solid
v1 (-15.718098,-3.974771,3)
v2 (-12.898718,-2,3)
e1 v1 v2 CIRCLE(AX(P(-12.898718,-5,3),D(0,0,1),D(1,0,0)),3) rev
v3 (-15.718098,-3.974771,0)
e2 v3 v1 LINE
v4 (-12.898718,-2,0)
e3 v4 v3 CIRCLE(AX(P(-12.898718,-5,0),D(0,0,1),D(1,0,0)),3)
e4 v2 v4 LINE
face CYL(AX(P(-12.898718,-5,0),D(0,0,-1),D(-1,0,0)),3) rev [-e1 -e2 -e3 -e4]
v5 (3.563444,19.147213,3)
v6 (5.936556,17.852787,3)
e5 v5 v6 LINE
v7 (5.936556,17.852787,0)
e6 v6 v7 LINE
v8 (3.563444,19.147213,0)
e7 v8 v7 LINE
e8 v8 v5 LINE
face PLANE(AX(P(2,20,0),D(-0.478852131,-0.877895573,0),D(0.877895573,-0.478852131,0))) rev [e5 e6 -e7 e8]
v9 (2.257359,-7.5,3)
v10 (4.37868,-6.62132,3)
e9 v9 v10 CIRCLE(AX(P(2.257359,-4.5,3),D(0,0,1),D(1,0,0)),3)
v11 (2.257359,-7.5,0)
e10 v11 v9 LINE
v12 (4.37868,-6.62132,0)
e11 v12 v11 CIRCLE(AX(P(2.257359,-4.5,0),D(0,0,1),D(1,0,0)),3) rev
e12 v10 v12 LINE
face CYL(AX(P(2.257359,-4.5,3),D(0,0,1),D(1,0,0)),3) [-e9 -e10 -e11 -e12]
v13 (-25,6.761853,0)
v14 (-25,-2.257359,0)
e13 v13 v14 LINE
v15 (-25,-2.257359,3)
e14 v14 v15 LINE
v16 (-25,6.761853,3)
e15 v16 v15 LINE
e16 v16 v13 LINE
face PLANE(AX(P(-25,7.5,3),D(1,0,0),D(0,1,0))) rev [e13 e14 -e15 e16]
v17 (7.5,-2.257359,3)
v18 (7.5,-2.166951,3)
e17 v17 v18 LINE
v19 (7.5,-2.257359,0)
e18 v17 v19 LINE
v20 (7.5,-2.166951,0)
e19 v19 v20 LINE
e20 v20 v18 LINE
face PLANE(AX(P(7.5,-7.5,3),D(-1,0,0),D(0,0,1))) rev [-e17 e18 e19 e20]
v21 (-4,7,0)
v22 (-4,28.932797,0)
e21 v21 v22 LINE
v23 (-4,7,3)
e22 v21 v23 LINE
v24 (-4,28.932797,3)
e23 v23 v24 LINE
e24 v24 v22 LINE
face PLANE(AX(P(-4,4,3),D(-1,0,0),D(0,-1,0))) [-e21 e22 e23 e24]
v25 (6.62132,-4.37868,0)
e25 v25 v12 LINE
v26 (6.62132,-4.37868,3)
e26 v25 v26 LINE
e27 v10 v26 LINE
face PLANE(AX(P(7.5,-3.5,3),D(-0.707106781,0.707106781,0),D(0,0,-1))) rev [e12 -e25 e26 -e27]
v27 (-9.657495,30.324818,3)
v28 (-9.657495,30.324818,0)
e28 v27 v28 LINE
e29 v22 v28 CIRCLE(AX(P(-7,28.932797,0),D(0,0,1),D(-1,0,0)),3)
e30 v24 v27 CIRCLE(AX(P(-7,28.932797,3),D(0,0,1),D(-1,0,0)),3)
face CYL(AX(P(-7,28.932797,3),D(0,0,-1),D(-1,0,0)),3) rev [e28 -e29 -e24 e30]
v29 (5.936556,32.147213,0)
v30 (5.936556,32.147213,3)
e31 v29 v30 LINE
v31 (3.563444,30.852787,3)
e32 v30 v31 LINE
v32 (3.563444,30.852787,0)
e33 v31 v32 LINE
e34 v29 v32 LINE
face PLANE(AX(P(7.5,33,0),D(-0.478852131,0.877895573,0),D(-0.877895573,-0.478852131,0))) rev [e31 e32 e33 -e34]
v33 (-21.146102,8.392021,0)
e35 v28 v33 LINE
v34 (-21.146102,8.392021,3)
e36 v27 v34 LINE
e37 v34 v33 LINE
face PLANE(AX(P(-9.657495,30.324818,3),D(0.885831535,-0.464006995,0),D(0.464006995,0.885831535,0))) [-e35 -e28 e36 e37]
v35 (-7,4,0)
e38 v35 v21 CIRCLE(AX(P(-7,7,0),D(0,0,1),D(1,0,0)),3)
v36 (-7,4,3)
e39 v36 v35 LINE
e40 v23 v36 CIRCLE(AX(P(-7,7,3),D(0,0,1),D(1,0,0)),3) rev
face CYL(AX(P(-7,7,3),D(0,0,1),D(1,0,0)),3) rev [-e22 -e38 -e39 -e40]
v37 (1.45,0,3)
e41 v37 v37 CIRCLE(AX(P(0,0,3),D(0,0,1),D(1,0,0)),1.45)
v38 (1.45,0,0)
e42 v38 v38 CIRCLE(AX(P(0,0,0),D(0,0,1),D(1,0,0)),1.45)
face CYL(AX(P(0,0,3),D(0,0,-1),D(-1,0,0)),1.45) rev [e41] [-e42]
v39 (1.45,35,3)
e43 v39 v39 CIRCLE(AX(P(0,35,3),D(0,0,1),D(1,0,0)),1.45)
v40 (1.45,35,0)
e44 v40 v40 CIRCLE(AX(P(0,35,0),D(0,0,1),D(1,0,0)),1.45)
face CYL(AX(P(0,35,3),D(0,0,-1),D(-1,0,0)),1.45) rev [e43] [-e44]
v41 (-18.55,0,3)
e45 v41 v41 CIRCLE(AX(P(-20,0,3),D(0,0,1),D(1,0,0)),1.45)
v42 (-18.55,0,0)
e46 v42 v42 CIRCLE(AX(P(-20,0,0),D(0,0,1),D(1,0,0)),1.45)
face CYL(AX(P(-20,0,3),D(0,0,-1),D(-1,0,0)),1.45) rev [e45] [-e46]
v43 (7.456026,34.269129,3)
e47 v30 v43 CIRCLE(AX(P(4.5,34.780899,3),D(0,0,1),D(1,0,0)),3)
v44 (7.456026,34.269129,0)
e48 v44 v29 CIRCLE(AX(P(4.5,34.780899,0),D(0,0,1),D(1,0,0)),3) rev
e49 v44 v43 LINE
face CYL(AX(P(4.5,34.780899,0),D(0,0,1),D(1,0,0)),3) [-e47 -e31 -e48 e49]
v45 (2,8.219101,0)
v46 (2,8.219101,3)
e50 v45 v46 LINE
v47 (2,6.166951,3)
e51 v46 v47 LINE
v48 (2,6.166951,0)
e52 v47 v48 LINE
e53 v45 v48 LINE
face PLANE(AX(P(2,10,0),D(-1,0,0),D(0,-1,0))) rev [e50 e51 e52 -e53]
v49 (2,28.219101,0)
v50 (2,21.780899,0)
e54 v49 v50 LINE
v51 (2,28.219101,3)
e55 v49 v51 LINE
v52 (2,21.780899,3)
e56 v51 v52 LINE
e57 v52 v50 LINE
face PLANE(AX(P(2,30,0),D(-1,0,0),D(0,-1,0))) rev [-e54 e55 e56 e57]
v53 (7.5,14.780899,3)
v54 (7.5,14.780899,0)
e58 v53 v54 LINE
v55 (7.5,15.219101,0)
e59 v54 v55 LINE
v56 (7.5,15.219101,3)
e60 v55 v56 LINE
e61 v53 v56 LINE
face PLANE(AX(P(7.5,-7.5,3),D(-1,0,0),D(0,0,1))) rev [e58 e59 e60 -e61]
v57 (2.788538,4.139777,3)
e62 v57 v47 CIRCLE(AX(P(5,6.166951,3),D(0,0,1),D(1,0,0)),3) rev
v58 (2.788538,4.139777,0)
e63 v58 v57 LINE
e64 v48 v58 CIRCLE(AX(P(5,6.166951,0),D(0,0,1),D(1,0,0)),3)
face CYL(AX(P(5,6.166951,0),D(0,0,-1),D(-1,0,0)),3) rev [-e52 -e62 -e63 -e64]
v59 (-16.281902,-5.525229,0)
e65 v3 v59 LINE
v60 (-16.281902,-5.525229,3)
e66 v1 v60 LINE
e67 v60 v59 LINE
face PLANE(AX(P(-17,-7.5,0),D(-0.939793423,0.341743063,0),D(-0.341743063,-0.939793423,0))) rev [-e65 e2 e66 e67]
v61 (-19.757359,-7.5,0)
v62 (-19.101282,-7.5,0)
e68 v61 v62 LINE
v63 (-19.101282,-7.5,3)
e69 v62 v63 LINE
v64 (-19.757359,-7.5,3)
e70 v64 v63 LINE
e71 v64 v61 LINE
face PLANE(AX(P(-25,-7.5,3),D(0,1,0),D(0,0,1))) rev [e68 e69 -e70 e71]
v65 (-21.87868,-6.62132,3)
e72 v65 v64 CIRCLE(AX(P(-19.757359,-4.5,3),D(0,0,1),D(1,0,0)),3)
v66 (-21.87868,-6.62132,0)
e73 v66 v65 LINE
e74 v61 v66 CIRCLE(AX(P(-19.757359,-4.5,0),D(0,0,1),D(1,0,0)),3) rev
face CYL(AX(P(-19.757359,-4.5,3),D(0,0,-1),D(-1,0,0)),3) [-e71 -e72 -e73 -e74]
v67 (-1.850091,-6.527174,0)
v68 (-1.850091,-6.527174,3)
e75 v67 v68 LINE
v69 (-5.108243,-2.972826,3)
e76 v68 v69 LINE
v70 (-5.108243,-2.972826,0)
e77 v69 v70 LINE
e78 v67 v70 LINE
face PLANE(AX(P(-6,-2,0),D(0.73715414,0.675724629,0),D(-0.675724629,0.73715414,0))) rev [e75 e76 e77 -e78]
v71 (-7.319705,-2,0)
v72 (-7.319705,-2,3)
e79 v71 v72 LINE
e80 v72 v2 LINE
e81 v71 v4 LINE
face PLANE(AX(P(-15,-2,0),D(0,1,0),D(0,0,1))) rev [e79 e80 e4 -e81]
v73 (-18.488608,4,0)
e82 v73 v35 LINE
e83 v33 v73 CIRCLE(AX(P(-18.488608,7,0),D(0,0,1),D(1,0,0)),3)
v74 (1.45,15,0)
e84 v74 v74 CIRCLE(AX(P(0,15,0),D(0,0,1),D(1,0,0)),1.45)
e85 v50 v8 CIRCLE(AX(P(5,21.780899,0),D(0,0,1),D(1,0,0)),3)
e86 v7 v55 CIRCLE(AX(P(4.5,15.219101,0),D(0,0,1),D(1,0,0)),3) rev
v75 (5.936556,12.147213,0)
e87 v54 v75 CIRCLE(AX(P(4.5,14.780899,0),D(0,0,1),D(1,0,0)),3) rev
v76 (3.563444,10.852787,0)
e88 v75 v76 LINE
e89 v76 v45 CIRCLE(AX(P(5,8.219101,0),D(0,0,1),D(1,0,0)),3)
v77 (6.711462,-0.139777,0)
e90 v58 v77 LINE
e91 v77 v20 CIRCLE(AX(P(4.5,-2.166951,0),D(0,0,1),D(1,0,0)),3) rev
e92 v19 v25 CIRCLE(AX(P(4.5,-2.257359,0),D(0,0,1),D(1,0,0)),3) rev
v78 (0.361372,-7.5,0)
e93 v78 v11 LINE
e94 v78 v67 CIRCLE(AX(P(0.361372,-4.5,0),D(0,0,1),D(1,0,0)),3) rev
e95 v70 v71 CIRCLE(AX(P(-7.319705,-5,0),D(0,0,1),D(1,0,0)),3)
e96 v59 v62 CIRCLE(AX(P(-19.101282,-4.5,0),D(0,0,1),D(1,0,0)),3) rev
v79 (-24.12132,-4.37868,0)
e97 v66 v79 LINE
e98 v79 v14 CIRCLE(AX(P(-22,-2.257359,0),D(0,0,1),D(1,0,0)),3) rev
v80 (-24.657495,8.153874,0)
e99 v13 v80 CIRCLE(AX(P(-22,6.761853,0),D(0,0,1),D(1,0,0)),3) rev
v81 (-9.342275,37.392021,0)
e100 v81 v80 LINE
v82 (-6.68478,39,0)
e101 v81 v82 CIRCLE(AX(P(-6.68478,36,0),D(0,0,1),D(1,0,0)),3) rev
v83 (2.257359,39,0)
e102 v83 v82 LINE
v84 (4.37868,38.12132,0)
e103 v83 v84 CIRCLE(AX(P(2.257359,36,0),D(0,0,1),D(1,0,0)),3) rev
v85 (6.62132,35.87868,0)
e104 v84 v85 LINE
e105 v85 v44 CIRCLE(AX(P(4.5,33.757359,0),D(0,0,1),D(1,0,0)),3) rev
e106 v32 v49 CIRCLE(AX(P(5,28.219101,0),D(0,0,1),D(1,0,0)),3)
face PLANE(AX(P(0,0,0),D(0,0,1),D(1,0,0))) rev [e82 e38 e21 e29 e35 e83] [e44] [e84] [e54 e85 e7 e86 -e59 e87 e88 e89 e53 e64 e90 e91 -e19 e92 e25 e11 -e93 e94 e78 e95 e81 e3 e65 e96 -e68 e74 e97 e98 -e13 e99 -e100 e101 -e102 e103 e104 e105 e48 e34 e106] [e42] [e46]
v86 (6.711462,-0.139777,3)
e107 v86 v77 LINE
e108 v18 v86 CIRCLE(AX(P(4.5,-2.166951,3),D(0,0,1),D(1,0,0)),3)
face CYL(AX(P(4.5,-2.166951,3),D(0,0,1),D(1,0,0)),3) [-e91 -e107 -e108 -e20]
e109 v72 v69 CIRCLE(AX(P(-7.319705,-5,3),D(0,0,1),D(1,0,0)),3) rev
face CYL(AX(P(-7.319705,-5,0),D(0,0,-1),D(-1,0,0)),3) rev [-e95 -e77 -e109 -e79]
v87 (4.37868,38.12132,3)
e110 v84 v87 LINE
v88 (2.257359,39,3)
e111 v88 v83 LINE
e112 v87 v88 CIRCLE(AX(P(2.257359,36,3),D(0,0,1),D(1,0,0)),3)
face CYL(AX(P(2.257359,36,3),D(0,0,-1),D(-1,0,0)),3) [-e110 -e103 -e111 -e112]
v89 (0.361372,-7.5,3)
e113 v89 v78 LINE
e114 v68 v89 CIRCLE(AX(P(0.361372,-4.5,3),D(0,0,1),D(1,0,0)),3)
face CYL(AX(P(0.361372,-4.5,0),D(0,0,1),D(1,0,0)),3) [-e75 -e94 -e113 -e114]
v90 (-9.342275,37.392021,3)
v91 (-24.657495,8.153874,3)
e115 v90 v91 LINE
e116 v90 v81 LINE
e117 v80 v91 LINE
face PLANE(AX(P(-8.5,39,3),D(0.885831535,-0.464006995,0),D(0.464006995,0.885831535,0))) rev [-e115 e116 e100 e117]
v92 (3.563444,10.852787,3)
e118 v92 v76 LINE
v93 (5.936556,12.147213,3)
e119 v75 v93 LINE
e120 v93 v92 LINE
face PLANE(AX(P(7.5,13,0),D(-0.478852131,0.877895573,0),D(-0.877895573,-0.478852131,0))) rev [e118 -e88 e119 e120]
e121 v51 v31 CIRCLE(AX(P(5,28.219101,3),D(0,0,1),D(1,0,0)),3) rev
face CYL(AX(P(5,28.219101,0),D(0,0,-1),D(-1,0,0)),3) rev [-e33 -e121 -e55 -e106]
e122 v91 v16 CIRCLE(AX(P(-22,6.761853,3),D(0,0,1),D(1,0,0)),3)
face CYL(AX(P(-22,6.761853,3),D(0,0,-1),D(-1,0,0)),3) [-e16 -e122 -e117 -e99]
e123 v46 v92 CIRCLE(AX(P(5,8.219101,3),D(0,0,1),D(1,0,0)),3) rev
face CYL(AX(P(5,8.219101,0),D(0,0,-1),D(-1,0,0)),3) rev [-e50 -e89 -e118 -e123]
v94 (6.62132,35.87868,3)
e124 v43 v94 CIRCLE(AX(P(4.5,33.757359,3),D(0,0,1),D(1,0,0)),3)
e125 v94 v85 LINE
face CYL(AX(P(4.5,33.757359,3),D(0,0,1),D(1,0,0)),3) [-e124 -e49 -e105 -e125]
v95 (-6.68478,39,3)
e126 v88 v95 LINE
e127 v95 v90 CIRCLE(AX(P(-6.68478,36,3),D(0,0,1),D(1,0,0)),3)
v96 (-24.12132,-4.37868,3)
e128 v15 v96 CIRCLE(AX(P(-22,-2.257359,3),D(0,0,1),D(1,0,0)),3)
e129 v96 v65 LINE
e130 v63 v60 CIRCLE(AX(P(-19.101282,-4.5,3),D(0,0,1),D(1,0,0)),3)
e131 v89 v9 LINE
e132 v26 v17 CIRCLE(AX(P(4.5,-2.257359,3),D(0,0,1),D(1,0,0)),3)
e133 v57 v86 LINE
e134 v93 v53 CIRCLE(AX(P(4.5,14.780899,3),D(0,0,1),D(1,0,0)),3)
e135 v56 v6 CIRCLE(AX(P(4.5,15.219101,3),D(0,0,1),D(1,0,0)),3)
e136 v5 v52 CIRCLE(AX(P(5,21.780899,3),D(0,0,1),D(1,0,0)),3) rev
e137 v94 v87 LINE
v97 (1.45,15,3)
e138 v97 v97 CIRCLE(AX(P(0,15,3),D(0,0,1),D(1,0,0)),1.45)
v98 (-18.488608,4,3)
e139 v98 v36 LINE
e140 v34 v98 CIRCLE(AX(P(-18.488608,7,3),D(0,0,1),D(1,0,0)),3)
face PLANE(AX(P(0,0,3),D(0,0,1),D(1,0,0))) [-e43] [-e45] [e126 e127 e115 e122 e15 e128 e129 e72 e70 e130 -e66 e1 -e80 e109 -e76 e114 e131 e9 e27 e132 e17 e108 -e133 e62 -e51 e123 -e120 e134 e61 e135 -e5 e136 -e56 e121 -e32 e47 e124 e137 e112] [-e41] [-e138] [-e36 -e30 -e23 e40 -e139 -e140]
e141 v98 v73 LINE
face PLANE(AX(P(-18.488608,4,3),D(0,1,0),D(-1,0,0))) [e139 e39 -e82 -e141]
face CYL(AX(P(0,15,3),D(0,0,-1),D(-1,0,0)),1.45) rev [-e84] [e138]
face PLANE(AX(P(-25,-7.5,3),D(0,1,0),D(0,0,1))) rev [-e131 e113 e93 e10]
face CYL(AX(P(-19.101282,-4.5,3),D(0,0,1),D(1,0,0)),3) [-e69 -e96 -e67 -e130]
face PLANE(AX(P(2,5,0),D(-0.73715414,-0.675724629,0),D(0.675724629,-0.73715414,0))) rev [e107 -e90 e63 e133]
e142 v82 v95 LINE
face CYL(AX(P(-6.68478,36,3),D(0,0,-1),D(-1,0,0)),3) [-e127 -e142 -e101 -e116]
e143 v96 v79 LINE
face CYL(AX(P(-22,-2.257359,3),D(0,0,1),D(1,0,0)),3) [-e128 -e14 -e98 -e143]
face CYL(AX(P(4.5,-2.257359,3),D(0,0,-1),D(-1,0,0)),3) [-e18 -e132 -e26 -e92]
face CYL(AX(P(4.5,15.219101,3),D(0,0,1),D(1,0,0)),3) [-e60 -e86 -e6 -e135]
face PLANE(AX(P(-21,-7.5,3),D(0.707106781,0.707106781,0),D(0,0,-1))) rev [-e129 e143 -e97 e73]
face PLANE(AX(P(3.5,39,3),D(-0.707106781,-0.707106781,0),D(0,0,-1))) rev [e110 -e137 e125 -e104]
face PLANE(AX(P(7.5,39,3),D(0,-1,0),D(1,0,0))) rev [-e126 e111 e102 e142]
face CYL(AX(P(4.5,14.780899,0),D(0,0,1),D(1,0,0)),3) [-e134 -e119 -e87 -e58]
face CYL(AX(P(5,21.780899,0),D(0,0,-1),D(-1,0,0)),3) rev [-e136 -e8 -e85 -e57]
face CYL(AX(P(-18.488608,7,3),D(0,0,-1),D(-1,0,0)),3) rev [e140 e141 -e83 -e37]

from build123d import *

# Parameters (mm, degrees)
SKETCH_1_R          = 1.45
EXTRUDE_1_DEPTH     = 3
CHAMFER_1_SIZE      = 4
CUT_EXTRUDE_1_DEPTH = 47.421977554
FILLET_1_R          = 3
FILLET_2_R          = 3


with BuildPart() as part:
    # 草图1 → 凸台-拉伸1 (new body)
    with BuildSketch(Plane.XY):
        Polygon((-25, 7.5), (-25, -7.5), (7.5, -7.5), (7.5, 39), (-8.5, 39), align=None)
        with Locations((-20, 0)):
            Circle(SKETCH_1_R, mode=Mode.SUBTRACT)
        Circle(SKETCH_1_R, mode=Mode.SUBTRACT)
        with Locations((0, 15)):
            Circle(SKETCH_1_R, mode=Mode.SUBTRACT)
        with Locations((0, 35)):
            Circle(SKETCH_1_R, mode=Mode.SUBTRACT)
        with BuildLine():
            Line((-9.657494606, 30.324817794), (-21.146102459, 8.392020984))
            ThreePointArc((-21.146102459, 8.392020984), (-21.055323941, 5.446948641), (-18.488607853, 4))
            Line((-18.488607853, 4), (-4, 4))
            Line((-4, 4), (-4, 28.93279681))
            ThreePointArc((-4, 28.93279681), (-6.283230796, 31.845912308), (-9.657494606, 30.324817794))
        make_face(mode=Mode.SUBTRACT)
    extrude(amount=EXTRUDE_1_DEPTH)

    # 倒角1
    chamfer_1_edges = [part.edges().sort_by_distance(p)[0] for p in [
        (7.5, 39, 1.5),
        (7.5, -7.5, 1.5),
        (-25, -7.5, 1.5),
    ]]
    chamfer(chamfer_1_edges, length=CHAMFER_1_SIZE)

    # 草图2 → 切除-拉伸1 (cut, through all)
    with BuildSketch(Plane.XY.offset(3)):
        Polygon((-17, -7.5), (-15, -2), (-6, -2), (-0.958333333, -7.5), align=None)
        Polygon((7.5, 33), (2, 30), (2, 20), (7.5, 17), align=None)
        Polygon((7.5, 13), (2, 10), (2, 5), (7.5, -1), align=None)
    extrude(amount=-CUT_EXTRUDE_1_DEPTH, mode=Mode.SUBTRACT)

    # 圆角1
    fillet_1_edges = [part.edges().sort_by_distance(p)[0] for p in [
        (-4, 4, 1.5),
    ]]
    fillet(fillet_1_edges, radius=FILLET_1_R)

    # 圆角2
    # the kernel refuses this fillet: 3 mm, written as the material it adds along each edge
    with BuildSketch(Plane(origin=(2, 5, 3), x_dir=(0, 1, 0), z_dir=(0, 0, -1))) as fillet_2_piece_1:
        with BuildLine():
            CenterArc((FILLET_2_R * 0.388983690555, FILLET_2_R), FILLET_2_R, 227.489552922, 42.510447078)
            Line((-FILLET_2_R * 0.286740937963, FILLET_2_R * 0.262845859799), (0, 0))
            Line((0, 0), (FILLET_2_R * 0.388983690555, 0))
        make_face()
    extrude(amount=3)
    with BuildSketch(Plane(origin=(2, 10, 3), x_dir=(0.8778955729143842, 0.4788521306805734, 0), z_dir=(0, 0, -1)), Plane(origin=(2, 20, 3), x_dir=(0, 1, 0), z_dir=(0, 0, -1)), Plane(origin=(2, 30, 3), x_dir=(0.8778955729143848, 0.4788521306805725, 0), z_dir=(0, 0, -1))) as fillet_2_piece_2:
        with BuildLine():
            CenterArc((FILLET_2_R * 0.59363309874, FILLET_2_R), FILLET_2_R, 208.610459666, 61.389540334)
            Line((-FILLET_2_R * 0.284262474174, FILLET_2_R * 0.521147869319), (0, 0))
            Line((0, 0), (FILLET_2_R * 0.59363309874, 0))
        make_face()
    extrude(amount=3)
    with BuildSketch(Plane(origin=(-15, -2, 3), x_dir=(1, 0, 0), z_dir=(0, 0, -1))) as fillet_2_piece_3:
        with BuildLine():
            CenterArc((FILLET_2_R * 0.700427264611, FILLET_2_R), FILLET_2_R, 199.983106522, 70.016893478)
            Line((-FILLET_2_R * 0.239366158878, FILLET_2_R * 0.658256936913), (0, 0))
            Line((0, 0), (FILLET_2_R * 0.700427264611, 0))
        make_face()
    extrude(amount=3)
    with BuildSketch(Plane(origin=(-6, -2, 3), x_dir=(0.6757246285173465, -0.7371541402007414, 0), z_dir=(0, 0, -1))) as fillet_2_piece_4:
        with BuildLine():
            CenterArc((FILLET_2_R * 0.439901716342, FILLET_2_R), FILLET_2_R, 222.510447078, 47.489552922)
            Line((-FILLET_2_R * 0.297252423859, FILLET_2_R * 0.324275371483), (0, 0))
            Line((0, 0), (FILLET_2_R * 0.439901716342, 0))
        make_face()
    extrude(amount=3)
    # the kernel refuses this fillet: 3 mm, written as the material it takes off along each edge
    with BuildSketch(Plane(origin=(7.5, 13, 7.452248241), x_dir=(0, 1, 0), z_dir=(0, 0, -1)), Plane(origin=(7.5, 33, 7.452248241), x_dir=(0, 1, 0), z_dir=(0, 0, -1)), Plane(origin=(7.5, 17, 7.452248241), x_dir=(-0.8778955729143842, 0.4788521306805734, 0), z_dir=(0, 0, -1))) as fillet_2_2_piece_1:
        with BuildLine():
            CenterArc((FILLET_2_R * 0.59363309874, -FILLET_2_R), FILLET_2_R, 90, 61.389540334)
            Line((-FILLET_2_R * 0.284262474174, -FILLET_2_R * 0.521147869319), (0, 0))
            Line((0, 0), (FILLET_2_R * 0.59363309874, 0))
        make_face()
    extrude(amount=11.904496481, mode=Mode.SUBTRACT)
    with BuildSketch(Plane(origin=(7.5, -1, 5.917377679), x_dir=(-0.6757246285173458, 0.7371541402007418, 0), z_dir=(0, 0, -1))) as fillet_2_2_piece_2:
        with BuildLine():
            CenterArc((FILLET_2_R * 0.388983690555, -FILLET_2_R), FILLET_2_R, 90, 42.510447078)
            Line((-FILLET_2_R * 0.286740937963, -FILLET_2_R * 0.262845859799), (0, 0))
            Line((0, 0), (FILLET_2_R * 0.388983690555, 0))
        make_face()
    extrude(amount=8.834755358, mode=Mode.SUBTRACT)
    with BuildSketch(Plane(origin=(3.5, -7.5, -3.106601718), x_dir=(0.7071067811865475, 0.7071067811865475, 0), z_dir=(0, 0, 1)), Plane(origin=(-21, -7.5, -3.106601718), x_dir=(1, 0, 0), z_dir=(0, 0, 1)), Plane(origin=(7.5, 35, -3.106601718), x_dir=(-0.7071067811865482, 0.7071067811865468, 0), z_dir=(0, 0, 1)), Plane(origin=(7.5, -3.5, -3.106601718), x_dir=(0, 1, 0), z_dir=(0, 0, 1)), Plane(origin=(3.5, 39, -3.106601718), x_dir=(-1, 0, 0), z_dir=(0, 0, 1))) as fillet_2_2_piece_3:
        with BuildLine():
            CenterArc((FILLET_2_R * 0.414213562373, FILLET_2_R), FILLET_2_R, 225, 45)
            Line((-FILLET_2_R * 0.292893218813, FILLET_2_R * 0.292893218813), (0, 0))
            Line((0, 0), (FILLET_2_R * 0.414213562373, 0))
        make_face()
    extrude(amount=9.213203436, mode=Mode.SUBTRACT)
    with BuildSketch(Plane(origin=(-25, -3.5, -3.106601718), x_dir=(0, 1, 0), z_dir=(0, 0, 1))) as fillet_2_2_piece_4:
        with BuildLine():
            CenterArc((FILLET_2_R * 0.414213562373, -FILLET_2_R), FILLET_2_R, 90, 45)
            Line((-FILLET_2_R * 0.292893218813, -FILLET_2_R * 0.292893218813), (0, 0))
            Line((0, 0), (FILLET_2_R * 0.414213562373, 0))
        make_face()
    extrude(amount=9.213203436, mode=Mode.SUBTRACT)
    with BuildSketch(Plane(origin=(-0.958333333, -7.5, 6.299262873), x_dir=(1, 0, 0), z_dir=(0, 0, -1))) as fillet_2_2_piece_5:
        with BuildLine():
            CenterArc((FILLET_2_R * 0.439901716342, -FILLET_2_R), FILLET_2_R, 90, 47.489552922)
            Line((-FILLET_2_R * 0.297252423859, -FILLET_2_R * 0.324275371483), (0, 0))
            Line((0, 0), (FILLET_2_R * 0.439901716342, 0))
        make_face()
    extrude(amount=9.598525745, mode=Mode.SUBTRACT)
    with BuildSketch(Plane(origin=(-17, -7.5, 8.253204485), x_dir=(0.341743063086704, 0.9397934234884372, 0), z_dir=(0, 0, -1))) as fillet_2_2_piece_6:
        with BuildLine():
            CenterArc((FILLET_2_R * 0.700427264611, -FILLET_2_R), FILLET_2_R, 90, 70.016893478)
            Line((-FILLET_2_R * 0.239366158878, -FILLET_2_R * 0.658256936913), (0, 0))
            Line((0, 0), (FILLET_2_R * 0.700427264611, 0))
        make_face()
    extrude(amount=13.506408969, mode=Mode.SUBTRACT)
    with BuildSketch(Plane(origin=(-8.5, 39, -4.538049708), x_dir=(-0.464006994670558, -0.8858315352801552, 0), z_dir=(0, 0, 1))) as fillet_2_2_piece_7:
        with BuildLine():
            CenterArc((FILLET_2_R * 0.605073294393, FILLET_2_R), FILLET_2_R, 207.645975364, 62.354024636)
            Line((-FILLET_2_R * 0.280758240887, FILLET_2_R * 0.535993005329), (0, 0))
            Line((0, 0), (FILLET_2_R * 0.605073294393, 0))
        make_face()
    extrude(amount=12.076099416, mode=Mode.SUBTRACT)
    with BuildSketch(Plane(origin=(-25, 7.5, -1.845367624), x_dir=(0, -1, 0), z_dir=(0, 0, 1))) as fillet_2_2_piece_8:
        with BuildLine():
            CenterArc((FILLET_2_R * 0.246049016569, FILLET_2_R), FILLET_2_R, 242.354024636, 27.645975364)
            Line((-FILLET_2_R * 0.217957978102, FILLET_2_R * 0.11416846472), (0, 0))
            Line((0, 0), (FILLET_2_R * 0.246049016569, 0))
        make_face()
    extrude(amount=6.690735249, mode=Mode.SUBTRACT)


solid = part.part
